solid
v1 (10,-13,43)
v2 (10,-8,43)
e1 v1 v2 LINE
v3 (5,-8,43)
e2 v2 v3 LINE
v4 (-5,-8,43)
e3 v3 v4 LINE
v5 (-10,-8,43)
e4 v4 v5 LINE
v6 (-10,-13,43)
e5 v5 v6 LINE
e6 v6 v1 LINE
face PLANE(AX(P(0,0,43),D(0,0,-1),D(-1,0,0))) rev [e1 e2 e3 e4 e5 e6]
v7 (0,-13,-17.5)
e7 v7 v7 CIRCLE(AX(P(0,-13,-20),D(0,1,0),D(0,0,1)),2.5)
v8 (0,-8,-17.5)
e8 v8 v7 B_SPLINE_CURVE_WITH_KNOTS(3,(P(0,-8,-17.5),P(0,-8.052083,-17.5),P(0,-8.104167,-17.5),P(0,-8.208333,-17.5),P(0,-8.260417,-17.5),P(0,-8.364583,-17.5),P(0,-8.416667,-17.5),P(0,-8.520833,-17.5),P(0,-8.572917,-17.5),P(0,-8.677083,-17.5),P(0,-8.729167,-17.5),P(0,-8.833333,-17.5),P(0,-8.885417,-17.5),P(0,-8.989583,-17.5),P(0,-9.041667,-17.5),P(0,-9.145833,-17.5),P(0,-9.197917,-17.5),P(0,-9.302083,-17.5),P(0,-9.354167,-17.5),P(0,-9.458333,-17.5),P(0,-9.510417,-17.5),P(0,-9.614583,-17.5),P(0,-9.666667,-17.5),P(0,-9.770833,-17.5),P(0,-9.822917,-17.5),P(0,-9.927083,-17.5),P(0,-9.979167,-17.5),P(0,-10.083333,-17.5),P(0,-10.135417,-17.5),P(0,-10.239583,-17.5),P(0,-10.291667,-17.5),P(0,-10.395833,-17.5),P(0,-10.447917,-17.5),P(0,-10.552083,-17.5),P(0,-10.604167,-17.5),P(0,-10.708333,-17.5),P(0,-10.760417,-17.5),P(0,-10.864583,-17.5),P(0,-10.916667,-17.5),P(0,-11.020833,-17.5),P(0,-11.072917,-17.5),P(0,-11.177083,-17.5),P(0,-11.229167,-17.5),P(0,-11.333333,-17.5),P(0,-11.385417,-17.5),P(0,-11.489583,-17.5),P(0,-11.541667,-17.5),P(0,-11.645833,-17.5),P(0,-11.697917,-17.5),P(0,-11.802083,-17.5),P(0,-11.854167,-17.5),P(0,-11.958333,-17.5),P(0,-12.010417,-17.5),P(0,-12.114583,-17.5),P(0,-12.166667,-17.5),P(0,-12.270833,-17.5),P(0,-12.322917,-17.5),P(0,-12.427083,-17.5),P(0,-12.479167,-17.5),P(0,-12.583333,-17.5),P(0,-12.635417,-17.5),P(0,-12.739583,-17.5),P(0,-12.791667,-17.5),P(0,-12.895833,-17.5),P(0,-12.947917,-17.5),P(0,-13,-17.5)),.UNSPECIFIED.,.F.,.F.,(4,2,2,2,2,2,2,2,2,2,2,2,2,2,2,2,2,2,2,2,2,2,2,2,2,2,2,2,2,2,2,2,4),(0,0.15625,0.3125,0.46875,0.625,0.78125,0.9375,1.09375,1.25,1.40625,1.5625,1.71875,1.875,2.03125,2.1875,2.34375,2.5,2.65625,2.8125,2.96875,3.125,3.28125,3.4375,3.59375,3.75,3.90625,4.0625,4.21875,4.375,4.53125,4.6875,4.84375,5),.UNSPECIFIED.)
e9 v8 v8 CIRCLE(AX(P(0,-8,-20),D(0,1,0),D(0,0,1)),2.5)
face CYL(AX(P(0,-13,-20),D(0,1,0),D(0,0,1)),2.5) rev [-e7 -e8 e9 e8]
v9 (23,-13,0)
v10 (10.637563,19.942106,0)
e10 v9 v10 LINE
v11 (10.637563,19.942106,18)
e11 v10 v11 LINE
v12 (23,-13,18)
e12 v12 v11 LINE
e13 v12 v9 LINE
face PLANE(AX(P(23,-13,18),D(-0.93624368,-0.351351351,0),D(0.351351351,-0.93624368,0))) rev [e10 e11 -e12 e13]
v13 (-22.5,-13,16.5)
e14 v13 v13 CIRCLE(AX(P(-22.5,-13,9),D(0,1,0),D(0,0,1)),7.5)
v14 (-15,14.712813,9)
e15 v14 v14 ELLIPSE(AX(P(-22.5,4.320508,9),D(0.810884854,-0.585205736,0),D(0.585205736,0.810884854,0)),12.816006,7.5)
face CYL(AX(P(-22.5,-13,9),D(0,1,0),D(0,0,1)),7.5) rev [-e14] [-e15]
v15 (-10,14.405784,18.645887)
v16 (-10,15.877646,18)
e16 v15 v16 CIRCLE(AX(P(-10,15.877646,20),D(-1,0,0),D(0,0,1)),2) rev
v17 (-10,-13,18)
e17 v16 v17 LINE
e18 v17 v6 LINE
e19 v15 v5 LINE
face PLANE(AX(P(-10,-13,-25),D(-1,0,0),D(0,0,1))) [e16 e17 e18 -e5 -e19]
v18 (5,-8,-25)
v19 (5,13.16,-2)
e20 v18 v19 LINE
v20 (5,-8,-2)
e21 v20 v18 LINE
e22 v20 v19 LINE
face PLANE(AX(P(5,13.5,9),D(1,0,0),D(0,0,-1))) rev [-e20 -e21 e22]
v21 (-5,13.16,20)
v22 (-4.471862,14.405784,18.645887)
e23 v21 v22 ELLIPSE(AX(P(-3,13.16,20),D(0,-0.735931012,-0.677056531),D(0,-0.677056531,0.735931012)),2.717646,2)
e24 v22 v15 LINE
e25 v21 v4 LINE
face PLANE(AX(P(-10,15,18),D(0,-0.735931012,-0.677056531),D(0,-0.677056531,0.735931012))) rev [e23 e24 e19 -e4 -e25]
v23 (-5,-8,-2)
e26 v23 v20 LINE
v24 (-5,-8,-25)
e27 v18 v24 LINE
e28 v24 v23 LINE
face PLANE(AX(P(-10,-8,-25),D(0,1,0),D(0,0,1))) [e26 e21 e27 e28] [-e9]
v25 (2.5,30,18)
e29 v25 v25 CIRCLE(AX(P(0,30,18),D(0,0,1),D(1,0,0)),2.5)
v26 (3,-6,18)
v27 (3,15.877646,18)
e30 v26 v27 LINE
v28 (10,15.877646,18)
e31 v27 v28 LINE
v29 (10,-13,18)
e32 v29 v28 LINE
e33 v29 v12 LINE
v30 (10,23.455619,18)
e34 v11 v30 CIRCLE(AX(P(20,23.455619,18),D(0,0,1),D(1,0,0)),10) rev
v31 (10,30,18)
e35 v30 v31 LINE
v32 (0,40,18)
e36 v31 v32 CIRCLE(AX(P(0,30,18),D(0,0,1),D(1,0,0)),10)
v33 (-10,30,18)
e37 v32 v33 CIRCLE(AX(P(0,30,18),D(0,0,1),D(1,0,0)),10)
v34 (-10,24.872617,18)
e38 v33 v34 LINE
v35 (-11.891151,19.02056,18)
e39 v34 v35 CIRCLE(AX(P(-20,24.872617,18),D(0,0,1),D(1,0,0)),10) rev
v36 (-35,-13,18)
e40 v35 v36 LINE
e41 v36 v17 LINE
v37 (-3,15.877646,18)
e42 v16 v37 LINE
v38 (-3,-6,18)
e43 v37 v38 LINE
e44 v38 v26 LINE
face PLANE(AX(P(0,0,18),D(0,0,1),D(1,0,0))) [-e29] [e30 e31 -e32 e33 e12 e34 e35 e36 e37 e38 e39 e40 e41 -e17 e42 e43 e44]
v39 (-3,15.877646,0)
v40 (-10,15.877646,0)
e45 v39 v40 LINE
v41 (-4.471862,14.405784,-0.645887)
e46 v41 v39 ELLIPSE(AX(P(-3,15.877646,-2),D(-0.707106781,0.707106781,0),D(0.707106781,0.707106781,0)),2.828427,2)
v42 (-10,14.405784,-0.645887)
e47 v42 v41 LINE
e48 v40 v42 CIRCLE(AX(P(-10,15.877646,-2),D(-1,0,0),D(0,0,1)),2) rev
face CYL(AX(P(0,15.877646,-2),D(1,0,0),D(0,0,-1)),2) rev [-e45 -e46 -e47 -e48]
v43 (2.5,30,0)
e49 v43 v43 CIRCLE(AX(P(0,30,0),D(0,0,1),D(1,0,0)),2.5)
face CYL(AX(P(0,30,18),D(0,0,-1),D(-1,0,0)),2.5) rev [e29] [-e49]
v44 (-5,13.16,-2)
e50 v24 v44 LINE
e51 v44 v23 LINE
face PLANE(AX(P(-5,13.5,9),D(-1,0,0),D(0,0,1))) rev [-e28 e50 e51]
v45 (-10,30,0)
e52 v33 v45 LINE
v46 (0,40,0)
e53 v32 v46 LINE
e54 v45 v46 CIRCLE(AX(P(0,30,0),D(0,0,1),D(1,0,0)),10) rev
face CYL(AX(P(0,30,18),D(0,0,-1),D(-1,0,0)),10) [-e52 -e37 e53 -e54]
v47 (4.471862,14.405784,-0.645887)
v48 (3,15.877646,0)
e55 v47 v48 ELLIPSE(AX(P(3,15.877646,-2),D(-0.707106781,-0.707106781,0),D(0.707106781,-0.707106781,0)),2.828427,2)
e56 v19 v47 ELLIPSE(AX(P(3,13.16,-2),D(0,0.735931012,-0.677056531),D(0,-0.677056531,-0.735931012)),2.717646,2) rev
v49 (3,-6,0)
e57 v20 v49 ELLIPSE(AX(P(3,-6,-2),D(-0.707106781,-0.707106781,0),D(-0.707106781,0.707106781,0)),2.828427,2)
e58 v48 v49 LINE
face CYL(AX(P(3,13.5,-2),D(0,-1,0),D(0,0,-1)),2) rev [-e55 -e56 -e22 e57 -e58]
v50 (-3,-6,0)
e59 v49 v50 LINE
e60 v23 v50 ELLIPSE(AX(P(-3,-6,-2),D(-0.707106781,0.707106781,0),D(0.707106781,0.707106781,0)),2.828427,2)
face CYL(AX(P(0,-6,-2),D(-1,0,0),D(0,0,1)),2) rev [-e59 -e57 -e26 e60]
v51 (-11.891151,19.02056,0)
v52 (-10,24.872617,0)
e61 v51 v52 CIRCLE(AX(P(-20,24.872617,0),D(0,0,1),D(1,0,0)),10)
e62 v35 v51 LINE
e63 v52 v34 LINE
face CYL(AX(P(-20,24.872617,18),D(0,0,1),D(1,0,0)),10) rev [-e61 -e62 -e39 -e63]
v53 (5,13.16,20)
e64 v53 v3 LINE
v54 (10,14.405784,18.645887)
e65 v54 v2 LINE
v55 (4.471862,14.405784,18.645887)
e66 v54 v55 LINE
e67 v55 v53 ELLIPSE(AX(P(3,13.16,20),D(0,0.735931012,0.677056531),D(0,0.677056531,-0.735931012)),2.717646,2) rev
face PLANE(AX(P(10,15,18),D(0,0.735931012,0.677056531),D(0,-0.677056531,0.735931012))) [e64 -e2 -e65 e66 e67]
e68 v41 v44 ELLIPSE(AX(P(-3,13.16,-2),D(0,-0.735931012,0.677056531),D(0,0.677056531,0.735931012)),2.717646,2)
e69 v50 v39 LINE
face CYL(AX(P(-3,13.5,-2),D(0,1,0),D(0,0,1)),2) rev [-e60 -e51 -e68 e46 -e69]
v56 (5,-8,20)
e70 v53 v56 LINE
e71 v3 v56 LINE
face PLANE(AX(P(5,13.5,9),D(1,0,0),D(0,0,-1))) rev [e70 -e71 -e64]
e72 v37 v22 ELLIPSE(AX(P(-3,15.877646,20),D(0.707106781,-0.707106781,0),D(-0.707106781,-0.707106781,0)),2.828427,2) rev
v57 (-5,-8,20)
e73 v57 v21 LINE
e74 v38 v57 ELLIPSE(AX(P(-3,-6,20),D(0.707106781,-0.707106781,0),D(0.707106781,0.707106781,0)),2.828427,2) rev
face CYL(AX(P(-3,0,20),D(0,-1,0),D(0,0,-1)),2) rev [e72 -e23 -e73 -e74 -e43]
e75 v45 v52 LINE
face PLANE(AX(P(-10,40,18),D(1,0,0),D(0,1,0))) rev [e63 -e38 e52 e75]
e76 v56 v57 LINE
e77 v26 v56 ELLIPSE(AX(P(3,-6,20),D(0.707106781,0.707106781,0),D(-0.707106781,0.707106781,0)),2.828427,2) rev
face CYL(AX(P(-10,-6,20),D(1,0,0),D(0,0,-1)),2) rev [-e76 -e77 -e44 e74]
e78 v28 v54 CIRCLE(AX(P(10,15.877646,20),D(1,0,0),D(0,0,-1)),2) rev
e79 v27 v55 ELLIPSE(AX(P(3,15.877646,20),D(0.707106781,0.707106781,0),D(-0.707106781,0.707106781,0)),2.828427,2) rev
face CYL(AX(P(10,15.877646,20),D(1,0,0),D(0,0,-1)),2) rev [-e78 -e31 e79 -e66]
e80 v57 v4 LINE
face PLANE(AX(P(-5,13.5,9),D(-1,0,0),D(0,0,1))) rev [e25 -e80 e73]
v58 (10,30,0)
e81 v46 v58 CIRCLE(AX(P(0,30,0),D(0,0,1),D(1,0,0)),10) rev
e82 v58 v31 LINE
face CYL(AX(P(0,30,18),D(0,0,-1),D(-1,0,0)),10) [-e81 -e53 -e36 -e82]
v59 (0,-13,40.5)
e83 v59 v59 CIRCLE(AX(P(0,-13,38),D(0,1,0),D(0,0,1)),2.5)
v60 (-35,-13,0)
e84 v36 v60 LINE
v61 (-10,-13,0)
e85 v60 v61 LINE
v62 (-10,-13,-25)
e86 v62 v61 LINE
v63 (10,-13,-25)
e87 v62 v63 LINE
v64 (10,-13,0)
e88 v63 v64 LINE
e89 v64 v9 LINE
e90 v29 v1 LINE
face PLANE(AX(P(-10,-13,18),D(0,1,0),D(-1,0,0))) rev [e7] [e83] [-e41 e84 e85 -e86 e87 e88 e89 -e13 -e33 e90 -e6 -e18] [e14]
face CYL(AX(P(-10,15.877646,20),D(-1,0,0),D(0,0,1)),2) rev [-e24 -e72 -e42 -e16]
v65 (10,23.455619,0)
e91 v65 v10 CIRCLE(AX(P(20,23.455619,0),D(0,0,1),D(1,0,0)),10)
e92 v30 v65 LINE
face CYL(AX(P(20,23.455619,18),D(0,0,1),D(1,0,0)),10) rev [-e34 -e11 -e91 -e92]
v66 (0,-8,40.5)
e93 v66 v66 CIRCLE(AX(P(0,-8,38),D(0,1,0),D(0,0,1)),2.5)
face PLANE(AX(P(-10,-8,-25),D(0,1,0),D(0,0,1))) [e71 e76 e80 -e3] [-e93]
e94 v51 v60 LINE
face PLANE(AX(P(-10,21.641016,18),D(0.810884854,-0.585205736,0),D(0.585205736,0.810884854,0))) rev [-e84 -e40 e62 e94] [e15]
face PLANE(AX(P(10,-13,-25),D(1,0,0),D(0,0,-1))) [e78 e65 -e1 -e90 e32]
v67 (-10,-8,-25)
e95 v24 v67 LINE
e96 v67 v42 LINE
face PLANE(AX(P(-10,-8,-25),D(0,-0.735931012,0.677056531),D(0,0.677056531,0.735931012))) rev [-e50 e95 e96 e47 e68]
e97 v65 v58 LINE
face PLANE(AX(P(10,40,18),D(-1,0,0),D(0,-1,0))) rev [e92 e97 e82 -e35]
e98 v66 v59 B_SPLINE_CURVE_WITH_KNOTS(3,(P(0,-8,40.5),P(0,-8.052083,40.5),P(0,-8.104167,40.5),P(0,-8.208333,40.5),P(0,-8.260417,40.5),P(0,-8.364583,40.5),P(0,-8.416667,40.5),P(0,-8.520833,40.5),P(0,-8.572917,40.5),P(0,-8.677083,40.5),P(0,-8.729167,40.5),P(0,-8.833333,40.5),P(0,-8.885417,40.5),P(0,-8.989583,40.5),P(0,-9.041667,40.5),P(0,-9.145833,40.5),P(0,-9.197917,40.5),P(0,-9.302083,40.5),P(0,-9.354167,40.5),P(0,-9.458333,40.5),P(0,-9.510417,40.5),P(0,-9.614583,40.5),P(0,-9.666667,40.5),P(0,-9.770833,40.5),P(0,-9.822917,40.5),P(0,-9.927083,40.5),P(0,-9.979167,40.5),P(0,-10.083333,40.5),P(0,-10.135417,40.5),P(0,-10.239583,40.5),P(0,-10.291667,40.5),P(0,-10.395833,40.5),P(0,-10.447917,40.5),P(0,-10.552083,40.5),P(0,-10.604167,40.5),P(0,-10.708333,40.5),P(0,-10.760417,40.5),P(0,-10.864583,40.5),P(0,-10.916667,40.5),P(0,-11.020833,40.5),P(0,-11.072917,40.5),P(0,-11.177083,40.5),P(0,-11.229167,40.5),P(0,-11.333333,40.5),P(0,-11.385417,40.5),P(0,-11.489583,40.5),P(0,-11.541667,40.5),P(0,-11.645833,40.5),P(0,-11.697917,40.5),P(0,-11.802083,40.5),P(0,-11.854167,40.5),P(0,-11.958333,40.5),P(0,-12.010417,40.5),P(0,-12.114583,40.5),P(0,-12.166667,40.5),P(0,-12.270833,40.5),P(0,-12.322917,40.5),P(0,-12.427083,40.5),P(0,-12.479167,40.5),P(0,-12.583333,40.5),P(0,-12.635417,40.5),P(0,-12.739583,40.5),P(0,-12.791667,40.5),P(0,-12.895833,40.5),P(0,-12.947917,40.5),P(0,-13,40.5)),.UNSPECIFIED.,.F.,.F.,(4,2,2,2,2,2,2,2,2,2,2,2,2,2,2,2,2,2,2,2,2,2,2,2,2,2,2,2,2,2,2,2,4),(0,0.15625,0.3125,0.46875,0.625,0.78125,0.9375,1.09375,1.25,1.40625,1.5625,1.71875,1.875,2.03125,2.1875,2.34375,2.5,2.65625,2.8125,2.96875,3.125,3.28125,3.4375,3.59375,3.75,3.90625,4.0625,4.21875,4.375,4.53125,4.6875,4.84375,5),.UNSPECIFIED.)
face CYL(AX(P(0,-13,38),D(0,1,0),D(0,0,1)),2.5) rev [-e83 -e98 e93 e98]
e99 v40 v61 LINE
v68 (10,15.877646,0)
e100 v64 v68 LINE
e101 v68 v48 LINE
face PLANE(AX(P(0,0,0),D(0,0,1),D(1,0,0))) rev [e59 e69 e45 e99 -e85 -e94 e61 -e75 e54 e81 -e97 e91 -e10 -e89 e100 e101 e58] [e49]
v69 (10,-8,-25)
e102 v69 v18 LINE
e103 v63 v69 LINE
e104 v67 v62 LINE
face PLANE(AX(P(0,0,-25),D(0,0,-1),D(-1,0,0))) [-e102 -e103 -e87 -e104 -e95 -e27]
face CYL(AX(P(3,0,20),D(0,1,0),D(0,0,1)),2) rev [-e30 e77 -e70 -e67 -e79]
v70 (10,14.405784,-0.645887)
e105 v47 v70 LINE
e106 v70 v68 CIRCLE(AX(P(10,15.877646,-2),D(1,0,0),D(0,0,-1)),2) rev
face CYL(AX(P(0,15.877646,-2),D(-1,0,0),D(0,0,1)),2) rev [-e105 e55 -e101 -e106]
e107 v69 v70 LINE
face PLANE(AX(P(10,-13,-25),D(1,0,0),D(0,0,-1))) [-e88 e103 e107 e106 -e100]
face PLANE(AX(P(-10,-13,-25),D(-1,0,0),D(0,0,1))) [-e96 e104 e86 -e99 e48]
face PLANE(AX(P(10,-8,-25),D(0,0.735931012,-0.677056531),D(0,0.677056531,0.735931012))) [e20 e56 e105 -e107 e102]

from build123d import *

# Parameters (mm, degrees)
SKETCH1_W                = 20
SKETCH1_H                = 53
SKETCH1_R                = 2.5
BOSS_EXTRUDE1_DEPTH      = 18
FILLET1_R                = 10
BOSS_EXTRUDE2_DEPTH      = 18
BOSS_EXTRUDE3_DEPTH      = 43
BOSS_EXTRUDE3_DEPTH_BACK = 25
SKETCH3_W                = 20
SKETCH3_H                = 5
RIB8_REACH               = 69.365
SKETCH6_WALL_W           = 170.699933848
SKETCH6_WALL_H           = 5
RIB9_REACH               = 69.365
SKETCH7_WALL_W           = 170.699933848
SKETCH7_WALL_H           = 5
CUT_EXTRUDE1_DEPTH       = 69.366658541
CUT_EXTRUDE1_DEPTH_BACK  = 69.366658541
SKETCH8_R                = 2.5
SKETCH8_R_2              = 7.5
FILLET3_R                = 10
FILLET4_R                = 2


with BuildPart() as part:
    # Sketch1 → Boss-Extrude1 (new body)
    with BuildSketch(Plane.XY):
        with Locations((0, 13.5)):
            Rectangle(SKETCH1_W, SKETCH1_H)
        with Locations((0, 30)):
            Circle(SKETCH1_R, mode=Mode.SUBTRACT)
    extrude(amount=BOSS_EXTRUDE1_DEPTH)

    # Fillet1
    fillet1_edges = [part.edges().sort_by_distance(p)[0] for p in [
        (-10, 40, 9),
        (10, 40, 9),
    ]]
    fillet(fillet1_edges, radius=FILLET1_R - 0.0001)  # a hair under: the kernel refuses the full size

    # Sketch2 → Boss-Extrude2 (add)
    with BuildSketch(Plane.XY):
        Polygon((-10, 21.641016151), (-35, -13), (-10, -13), align=None)
        Polygon((10, 21.641016151), (10, -13), (23, -13), align=None)
    extrude(amount=BOSS_EXTRUDE2_DEPTH)

    # Sketch3 → Boss-Extrude3 (add, two sides: drawn at the far end of the back side and taken through both)
    with BuildSketch(Plane.XY.offset(-BOSS_EXTRUDE3_DEPTH_BACK)):
        with Locations((0, -10.5)):
            Rectangle(SKETCH3_W, SKETCH3_H)
    extrude(amount=BOSS_EXTRUDE3_DEPTH + BOSS_EXTRUDE3_DEPTH_BACK)

    # Sketch6 wall → Rib8 (add, up to next)
    with BuildSketch(Plane(origin=(-10, 3.5, -12.5), x_dir=(0, 0.677056530821, 0.735931011762), z_dir=(0, 0.735931011762, -0.677056530821)), mode=Mode.PRIVATE) as rib8_sk1:
        with Locations((0, 2.5)):
            Rectangle(SKETCH6_WALL_W, SKETCH6_WALL_H)
    rib8_tool1 = extrude(rib8_sk1.sketch, amount=-RIB8_REACH, mode=Mode.PRIVATE) - part.part
    rib8 = rib8_tool1.solids().sort_by_distance((-10, 3.5, -12.5))[0]
    add(rib8)

    # Sketch7 wall → Rib9 (add, up to next)
    with BuildSketch(Plane(origin=(-10, 3.5, 30.5), x_dir=(0, -0.677056530821, 0.735931011762), z_dir=(0, 0.735931011762, 0.677056530821)), mode=Mode.PRIVATE) as rib9_sk1:
        with Locations((0, 2.5)):
            Rectangle(SKETCH7_WALL_W, SKETCH7_WALL_H)
    rib9_tool1 = extrude(rib9_sk1.sketch, amount=-RIB9_REACH, mode=Mode.PRIVATE) - part.part
    rib9 = rib9_tool1.solids().sort_by_distance((-10, 3.5, 30.5))[0]
    add(rib9)

    # Mirror1: Rib8, Rib9 across plane
    add(rib8.mirror(Plane(origin=(0, 0, 0), x_dir=(0, 0, 1), z_dir=(1, 0, 0))))
    add(rib9.mirror(Plane(origin=(0, 0, 0), x_dir=(0, 0, 1), z_dir=(1, 0, 0))))

    # Sketch8 → Cut-Extrude1 (cut, two sides: drawn at the far end of the back side and taken through both)
    with BuildSketch(Plane(origin=(0, 0, 0), x_dir=(1, 0, 0), z_dir=(0, 1, 0)).offset(-CUT_EXTRUDE1_DEPTH_BACK)):
        with Locations(Location((0, 20, 0), (0, 0, 270))):
            Circle(SKETCH8_R)
        with Locations(Location((0, -38, 0), (0, 0, 270))):
            Circle(SKETCH8_R)
        with Locations(Location((-22.5, -9, 0), (0, 0, 270))):
            Circle(SKETCH8_R_2)
    extrude(amount=CUT_EXTRUDE1_DEPTH + CUT_EXTRUDE1_DEPTH_BACK, mode=Mode.SUBTRACT)

    # Fillet3
    fillet3_edges = [part.edges().sort_by_distance(p)[0] for p in [
        (-10, 21.641016151, 9),
        (10, 21.641016151, 9),
    ]]
    fillet(fillet3_edges, radius=FILLET3_R)

    # Fillet4
    fillet4_edges = [part.edges().sort_by_distance(p)[0] for p in [
        (-5, 3.5, 18),
        (-7.5, 15, 18),
        (0, -8, 0),
        (7.5, 15, 0),
        (5, 3.5, 0),
        (0, -8, 18),
        (5, 3.5, 18),
        (7.5, 15, 18),
        (-7.5, 15, 0),
        (-5, 3.5, 0),
    ]]
    fillet(fillet4_edges, radius=FILLET4_R)


solid = part.part
